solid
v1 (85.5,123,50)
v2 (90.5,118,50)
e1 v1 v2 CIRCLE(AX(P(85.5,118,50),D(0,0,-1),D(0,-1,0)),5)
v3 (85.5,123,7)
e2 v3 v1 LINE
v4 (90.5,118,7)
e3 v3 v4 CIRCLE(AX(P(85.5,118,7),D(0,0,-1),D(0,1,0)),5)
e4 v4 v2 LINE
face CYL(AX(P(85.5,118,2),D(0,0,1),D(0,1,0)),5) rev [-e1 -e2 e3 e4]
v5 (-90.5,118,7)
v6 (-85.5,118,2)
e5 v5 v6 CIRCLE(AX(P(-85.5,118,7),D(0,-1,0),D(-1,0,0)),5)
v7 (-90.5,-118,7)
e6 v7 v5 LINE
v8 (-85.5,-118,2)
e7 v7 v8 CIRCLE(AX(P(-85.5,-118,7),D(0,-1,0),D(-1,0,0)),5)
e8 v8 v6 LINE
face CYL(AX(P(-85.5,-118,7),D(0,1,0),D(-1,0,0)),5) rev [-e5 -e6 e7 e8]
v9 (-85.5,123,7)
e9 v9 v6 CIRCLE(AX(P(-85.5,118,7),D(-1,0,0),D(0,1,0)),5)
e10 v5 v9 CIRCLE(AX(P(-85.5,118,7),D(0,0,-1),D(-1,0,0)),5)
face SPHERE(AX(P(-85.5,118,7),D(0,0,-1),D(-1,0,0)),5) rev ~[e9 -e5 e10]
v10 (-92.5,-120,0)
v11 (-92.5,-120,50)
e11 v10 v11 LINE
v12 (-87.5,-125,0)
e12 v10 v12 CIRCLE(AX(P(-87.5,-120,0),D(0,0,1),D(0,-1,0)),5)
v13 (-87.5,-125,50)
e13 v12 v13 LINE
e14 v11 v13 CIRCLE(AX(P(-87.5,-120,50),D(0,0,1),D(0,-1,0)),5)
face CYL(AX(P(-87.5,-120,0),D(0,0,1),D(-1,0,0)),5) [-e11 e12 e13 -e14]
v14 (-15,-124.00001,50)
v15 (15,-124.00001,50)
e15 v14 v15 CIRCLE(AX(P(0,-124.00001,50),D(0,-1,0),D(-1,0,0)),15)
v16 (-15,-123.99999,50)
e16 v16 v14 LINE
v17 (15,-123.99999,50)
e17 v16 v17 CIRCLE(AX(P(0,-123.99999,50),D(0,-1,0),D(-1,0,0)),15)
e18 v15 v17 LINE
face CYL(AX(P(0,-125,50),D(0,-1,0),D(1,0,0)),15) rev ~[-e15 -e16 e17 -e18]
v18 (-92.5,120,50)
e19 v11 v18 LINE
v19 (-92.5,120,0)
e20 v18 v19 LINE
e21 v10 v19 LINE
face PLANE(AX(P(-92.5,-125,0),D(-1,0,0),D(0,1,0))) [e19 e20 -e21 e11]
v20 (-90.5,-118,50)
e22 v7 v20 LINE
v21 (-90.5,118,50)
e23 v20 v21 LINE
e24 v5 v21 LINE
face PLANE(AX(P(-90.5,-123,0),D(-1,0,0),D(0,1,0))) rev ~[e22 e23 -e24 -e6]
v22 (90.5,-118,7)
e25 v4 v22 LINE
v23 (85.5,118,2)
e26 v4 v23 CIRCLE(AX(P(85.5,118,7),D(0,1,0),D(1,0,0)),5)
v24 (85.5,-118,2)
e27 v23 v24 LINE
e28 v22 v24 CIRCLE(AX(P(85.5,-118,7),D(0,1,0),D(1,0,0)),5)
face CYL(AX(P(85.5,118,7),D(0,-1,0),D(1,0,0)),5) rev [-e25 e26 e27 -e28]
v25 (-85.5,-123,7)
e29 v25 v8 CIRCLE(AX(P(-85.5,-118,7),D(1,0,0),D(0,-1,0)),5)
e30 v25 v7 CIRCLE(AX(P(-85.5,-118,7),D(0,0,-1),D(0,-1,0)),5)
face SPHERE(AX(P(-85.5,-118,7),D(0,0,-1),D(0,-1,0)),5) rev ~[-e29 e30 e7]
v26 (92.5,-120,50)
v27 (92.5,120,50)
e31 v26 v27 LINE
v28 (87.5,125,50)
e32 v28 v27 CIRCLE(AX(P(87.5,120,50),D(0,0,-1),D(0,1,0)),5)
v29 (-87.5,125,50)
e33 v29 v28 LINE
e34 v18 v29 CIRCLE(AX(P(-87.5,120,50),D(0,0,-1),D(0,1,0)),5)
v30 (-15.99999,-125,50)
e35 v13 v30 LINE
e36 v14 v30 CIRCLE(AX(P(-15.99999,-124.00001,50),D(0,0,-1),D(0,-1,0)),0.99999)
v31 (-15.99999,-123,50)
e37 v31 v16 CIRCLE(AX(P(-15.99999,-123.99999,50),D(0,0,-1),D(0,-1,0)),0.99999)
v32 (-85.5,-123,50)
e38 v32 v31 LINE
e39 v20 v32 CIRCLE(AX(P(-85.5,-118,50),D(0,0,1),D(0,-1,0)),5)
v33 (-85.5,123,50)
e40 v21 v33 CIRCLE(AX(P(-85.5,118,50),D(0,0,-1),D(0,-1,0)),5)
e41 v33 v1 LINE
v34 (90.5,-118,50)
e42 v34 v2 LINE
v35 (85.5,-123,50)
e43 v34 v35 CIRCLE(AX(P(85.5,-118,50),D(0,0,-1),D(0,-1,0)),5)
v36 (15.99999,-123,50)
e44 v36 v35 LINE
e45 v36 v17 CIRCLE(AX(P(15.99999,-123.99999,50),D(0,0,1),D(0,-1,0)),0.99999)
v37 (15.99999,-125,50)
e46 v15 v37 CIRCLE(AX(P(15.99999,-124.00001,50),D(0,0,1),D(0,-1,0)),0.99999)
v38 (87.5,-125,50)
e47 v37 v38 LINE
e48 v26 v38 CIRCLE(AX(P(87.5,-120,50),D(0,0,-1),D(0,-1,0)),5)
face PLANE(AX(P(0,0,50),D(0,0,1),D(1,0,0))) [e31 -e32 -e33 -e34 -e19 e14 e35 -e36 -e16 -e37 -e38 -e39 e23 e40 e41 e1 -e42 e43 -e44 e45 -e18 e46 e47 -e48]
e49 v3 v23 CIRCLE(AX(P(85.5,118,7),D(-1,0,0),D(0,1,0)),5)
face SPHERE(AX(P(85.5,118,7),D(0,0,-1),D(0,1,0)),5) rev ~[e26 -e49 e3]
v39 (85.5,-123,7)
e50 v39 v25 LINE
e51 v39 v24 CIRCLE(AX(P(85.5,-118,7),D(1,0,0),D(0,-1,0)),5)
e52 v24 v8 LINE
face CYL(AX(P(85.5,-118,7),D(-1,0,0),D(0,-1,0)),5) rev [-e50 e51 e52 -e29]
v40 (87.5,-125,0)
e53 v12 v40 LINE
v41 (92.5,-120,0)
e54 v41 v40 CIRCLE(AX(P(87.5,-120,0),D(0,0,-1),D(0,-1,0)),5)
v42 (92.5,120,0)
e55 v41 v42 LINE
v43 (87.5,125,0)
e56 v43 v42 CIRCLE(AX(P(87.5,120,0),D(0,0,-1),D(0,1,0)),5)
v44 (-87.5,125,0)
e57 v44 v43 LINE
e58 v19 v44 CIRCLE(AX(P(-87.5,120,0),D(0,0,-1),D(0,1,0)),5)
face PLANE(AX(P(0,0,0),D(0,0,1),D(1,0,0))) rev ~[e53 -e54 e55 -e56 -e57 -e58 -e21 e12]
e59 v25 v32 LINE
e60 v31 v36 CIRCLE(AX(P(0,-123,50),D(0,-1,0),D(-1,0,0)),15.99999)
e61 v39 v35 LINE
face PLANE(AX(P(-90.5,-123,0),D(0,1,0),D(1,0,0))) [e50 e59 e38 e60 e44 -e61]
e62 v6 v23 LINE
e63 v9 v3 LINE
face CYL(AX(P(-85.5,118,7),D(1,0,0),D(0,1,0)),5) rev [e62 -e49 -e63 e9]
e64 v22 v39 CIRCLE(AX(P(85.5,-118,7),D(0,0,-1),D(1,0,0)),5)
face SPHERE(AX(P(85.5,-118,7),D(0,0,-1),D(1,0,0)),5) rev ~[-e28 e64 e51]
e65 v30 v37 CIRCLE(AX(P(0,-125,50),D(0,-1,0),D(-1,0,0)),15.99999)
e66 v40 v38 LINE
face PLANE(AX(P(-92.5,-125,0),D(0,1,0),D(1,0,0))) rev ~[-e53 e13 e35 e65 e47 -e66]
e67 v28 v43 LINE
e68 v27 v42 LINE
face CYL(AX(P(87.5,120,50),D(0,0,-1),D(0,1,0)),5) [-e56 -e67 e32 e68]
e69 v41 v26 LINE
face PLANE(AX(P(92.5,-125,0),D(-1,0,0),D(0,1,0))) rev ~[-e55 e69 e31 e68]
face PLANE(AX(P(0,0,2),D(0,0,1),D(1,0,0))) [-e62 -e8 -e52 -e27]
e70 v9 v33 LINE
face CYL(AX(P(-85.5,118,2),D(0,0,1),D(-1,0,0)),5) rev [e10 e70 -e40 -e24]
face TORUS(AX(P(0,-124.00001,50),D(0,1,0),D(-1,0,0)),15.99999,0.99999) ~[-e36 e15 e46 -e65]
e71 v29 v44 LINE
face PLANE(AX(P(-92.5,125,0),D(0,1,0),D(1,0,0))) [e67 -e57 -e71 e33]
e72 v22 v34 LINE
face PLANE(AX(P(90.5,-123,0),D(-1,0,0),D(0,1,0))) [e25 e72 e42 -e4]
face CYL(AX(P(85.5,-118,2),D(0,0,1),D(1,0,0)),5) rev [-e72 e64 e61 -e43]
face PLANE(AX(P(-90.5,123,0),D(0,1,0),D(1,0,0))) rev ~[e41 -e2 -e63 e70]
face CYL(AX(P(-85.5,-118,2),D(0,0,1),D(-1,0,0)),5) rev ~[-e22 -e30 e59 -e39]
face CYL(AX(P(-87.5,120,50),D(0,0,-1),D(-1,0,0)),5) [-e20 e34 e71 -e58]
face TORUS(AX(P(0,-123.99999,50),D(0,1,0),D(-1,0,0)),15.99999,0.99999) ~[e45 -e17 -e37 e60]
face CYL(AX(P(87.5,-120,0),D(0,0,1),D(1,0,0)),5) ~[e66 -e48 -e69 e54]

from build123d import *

# Parameters (mm, degrees)
F0_W     = 185
F0_H     = 250
F0_W_2   = 181
F0_H_2   = 246
F1_DEPTH = 50
F2_DEPTH = 2
F3_R     = 5
F4_R     = 5
F5_R     = 15
F6_DEPTH = 25
F7_R     = 0.99999


# Not quite as in the source:
# - a fillet or chamfer is up to 0.001 mm smaller than in the source, because OpenCascade refuses the exact size


with BuildPart() as f1:
    # F0 (on Top) → F1 (new body)
    with BuildSketch(Plane.XY):
        Rectangle(F0_W, F0_H)
        Rectangle(F0_W_2, F0_H_2, mode=Mode.SUBTRACT)
    extrude(amount=F1_DEPTH)

    # F0 (on Top) → F2 (join)
    with BuildSketch(Plane.XY):
        Rectangle(F0_W, F0_H)
        Rectangle(F0_W_2, F0_H_2, mode=Mode.SUBTRACT)
        Rectangle(F0_W_2, F0_H_2)
    extrude(amount=F2_DEPTH)

    # F3
    f3_edges = [f1.edges().sort_by_distance(p)[0] for p in [
        (92.5, 125, 25),
        (-92.5, 125, 25),
        (90.5, 123, 26),
        (-90.5, 123, 26),
        (-90.5, -123, 26),
        (-92.5, -125, 25),
        (92.5, -125, 25),
        (90.5, -123, 26),
    ]]
    fillet(f3_edges, radius=F3_R)

    # F4
    f4_edges = [f1.edges().sort_by_distance(p)[0] for p in [
        (-90.5, 0, 2),
        (-89.035534, -121.535534, 2),
        (-89.035534, 121.535534, 2),
        (0, -123, 2),
        (0, 123, 2),
        (89.035534, -121.535534, 2),
        (89.035534, 121.535534, 2),
        (90.5, 0, 2),
    ]]
    fillet(f4_edges, radius=F4_R)

    # F5 (on face) → F6 (cut)
    with BuildSketch(Plane.XZ.offset(125)):
        with Locations((0, 50)):
            Circle(F5_R)
    extrude(amount=-F6_DEPTH, mode=Mode.SUBTRACT)

    # F7 (radius 1 in the source; OpenCascade refuses exactly that, so slightly less here)
    f7_edges = [f1.edges().sort_by_distance(p)[0] for p in [
        (0, -123, 35),
        (0, -125, 35),
    ]]
    fillet(f7_edges, radius=F7_R)


solid = f1.part
